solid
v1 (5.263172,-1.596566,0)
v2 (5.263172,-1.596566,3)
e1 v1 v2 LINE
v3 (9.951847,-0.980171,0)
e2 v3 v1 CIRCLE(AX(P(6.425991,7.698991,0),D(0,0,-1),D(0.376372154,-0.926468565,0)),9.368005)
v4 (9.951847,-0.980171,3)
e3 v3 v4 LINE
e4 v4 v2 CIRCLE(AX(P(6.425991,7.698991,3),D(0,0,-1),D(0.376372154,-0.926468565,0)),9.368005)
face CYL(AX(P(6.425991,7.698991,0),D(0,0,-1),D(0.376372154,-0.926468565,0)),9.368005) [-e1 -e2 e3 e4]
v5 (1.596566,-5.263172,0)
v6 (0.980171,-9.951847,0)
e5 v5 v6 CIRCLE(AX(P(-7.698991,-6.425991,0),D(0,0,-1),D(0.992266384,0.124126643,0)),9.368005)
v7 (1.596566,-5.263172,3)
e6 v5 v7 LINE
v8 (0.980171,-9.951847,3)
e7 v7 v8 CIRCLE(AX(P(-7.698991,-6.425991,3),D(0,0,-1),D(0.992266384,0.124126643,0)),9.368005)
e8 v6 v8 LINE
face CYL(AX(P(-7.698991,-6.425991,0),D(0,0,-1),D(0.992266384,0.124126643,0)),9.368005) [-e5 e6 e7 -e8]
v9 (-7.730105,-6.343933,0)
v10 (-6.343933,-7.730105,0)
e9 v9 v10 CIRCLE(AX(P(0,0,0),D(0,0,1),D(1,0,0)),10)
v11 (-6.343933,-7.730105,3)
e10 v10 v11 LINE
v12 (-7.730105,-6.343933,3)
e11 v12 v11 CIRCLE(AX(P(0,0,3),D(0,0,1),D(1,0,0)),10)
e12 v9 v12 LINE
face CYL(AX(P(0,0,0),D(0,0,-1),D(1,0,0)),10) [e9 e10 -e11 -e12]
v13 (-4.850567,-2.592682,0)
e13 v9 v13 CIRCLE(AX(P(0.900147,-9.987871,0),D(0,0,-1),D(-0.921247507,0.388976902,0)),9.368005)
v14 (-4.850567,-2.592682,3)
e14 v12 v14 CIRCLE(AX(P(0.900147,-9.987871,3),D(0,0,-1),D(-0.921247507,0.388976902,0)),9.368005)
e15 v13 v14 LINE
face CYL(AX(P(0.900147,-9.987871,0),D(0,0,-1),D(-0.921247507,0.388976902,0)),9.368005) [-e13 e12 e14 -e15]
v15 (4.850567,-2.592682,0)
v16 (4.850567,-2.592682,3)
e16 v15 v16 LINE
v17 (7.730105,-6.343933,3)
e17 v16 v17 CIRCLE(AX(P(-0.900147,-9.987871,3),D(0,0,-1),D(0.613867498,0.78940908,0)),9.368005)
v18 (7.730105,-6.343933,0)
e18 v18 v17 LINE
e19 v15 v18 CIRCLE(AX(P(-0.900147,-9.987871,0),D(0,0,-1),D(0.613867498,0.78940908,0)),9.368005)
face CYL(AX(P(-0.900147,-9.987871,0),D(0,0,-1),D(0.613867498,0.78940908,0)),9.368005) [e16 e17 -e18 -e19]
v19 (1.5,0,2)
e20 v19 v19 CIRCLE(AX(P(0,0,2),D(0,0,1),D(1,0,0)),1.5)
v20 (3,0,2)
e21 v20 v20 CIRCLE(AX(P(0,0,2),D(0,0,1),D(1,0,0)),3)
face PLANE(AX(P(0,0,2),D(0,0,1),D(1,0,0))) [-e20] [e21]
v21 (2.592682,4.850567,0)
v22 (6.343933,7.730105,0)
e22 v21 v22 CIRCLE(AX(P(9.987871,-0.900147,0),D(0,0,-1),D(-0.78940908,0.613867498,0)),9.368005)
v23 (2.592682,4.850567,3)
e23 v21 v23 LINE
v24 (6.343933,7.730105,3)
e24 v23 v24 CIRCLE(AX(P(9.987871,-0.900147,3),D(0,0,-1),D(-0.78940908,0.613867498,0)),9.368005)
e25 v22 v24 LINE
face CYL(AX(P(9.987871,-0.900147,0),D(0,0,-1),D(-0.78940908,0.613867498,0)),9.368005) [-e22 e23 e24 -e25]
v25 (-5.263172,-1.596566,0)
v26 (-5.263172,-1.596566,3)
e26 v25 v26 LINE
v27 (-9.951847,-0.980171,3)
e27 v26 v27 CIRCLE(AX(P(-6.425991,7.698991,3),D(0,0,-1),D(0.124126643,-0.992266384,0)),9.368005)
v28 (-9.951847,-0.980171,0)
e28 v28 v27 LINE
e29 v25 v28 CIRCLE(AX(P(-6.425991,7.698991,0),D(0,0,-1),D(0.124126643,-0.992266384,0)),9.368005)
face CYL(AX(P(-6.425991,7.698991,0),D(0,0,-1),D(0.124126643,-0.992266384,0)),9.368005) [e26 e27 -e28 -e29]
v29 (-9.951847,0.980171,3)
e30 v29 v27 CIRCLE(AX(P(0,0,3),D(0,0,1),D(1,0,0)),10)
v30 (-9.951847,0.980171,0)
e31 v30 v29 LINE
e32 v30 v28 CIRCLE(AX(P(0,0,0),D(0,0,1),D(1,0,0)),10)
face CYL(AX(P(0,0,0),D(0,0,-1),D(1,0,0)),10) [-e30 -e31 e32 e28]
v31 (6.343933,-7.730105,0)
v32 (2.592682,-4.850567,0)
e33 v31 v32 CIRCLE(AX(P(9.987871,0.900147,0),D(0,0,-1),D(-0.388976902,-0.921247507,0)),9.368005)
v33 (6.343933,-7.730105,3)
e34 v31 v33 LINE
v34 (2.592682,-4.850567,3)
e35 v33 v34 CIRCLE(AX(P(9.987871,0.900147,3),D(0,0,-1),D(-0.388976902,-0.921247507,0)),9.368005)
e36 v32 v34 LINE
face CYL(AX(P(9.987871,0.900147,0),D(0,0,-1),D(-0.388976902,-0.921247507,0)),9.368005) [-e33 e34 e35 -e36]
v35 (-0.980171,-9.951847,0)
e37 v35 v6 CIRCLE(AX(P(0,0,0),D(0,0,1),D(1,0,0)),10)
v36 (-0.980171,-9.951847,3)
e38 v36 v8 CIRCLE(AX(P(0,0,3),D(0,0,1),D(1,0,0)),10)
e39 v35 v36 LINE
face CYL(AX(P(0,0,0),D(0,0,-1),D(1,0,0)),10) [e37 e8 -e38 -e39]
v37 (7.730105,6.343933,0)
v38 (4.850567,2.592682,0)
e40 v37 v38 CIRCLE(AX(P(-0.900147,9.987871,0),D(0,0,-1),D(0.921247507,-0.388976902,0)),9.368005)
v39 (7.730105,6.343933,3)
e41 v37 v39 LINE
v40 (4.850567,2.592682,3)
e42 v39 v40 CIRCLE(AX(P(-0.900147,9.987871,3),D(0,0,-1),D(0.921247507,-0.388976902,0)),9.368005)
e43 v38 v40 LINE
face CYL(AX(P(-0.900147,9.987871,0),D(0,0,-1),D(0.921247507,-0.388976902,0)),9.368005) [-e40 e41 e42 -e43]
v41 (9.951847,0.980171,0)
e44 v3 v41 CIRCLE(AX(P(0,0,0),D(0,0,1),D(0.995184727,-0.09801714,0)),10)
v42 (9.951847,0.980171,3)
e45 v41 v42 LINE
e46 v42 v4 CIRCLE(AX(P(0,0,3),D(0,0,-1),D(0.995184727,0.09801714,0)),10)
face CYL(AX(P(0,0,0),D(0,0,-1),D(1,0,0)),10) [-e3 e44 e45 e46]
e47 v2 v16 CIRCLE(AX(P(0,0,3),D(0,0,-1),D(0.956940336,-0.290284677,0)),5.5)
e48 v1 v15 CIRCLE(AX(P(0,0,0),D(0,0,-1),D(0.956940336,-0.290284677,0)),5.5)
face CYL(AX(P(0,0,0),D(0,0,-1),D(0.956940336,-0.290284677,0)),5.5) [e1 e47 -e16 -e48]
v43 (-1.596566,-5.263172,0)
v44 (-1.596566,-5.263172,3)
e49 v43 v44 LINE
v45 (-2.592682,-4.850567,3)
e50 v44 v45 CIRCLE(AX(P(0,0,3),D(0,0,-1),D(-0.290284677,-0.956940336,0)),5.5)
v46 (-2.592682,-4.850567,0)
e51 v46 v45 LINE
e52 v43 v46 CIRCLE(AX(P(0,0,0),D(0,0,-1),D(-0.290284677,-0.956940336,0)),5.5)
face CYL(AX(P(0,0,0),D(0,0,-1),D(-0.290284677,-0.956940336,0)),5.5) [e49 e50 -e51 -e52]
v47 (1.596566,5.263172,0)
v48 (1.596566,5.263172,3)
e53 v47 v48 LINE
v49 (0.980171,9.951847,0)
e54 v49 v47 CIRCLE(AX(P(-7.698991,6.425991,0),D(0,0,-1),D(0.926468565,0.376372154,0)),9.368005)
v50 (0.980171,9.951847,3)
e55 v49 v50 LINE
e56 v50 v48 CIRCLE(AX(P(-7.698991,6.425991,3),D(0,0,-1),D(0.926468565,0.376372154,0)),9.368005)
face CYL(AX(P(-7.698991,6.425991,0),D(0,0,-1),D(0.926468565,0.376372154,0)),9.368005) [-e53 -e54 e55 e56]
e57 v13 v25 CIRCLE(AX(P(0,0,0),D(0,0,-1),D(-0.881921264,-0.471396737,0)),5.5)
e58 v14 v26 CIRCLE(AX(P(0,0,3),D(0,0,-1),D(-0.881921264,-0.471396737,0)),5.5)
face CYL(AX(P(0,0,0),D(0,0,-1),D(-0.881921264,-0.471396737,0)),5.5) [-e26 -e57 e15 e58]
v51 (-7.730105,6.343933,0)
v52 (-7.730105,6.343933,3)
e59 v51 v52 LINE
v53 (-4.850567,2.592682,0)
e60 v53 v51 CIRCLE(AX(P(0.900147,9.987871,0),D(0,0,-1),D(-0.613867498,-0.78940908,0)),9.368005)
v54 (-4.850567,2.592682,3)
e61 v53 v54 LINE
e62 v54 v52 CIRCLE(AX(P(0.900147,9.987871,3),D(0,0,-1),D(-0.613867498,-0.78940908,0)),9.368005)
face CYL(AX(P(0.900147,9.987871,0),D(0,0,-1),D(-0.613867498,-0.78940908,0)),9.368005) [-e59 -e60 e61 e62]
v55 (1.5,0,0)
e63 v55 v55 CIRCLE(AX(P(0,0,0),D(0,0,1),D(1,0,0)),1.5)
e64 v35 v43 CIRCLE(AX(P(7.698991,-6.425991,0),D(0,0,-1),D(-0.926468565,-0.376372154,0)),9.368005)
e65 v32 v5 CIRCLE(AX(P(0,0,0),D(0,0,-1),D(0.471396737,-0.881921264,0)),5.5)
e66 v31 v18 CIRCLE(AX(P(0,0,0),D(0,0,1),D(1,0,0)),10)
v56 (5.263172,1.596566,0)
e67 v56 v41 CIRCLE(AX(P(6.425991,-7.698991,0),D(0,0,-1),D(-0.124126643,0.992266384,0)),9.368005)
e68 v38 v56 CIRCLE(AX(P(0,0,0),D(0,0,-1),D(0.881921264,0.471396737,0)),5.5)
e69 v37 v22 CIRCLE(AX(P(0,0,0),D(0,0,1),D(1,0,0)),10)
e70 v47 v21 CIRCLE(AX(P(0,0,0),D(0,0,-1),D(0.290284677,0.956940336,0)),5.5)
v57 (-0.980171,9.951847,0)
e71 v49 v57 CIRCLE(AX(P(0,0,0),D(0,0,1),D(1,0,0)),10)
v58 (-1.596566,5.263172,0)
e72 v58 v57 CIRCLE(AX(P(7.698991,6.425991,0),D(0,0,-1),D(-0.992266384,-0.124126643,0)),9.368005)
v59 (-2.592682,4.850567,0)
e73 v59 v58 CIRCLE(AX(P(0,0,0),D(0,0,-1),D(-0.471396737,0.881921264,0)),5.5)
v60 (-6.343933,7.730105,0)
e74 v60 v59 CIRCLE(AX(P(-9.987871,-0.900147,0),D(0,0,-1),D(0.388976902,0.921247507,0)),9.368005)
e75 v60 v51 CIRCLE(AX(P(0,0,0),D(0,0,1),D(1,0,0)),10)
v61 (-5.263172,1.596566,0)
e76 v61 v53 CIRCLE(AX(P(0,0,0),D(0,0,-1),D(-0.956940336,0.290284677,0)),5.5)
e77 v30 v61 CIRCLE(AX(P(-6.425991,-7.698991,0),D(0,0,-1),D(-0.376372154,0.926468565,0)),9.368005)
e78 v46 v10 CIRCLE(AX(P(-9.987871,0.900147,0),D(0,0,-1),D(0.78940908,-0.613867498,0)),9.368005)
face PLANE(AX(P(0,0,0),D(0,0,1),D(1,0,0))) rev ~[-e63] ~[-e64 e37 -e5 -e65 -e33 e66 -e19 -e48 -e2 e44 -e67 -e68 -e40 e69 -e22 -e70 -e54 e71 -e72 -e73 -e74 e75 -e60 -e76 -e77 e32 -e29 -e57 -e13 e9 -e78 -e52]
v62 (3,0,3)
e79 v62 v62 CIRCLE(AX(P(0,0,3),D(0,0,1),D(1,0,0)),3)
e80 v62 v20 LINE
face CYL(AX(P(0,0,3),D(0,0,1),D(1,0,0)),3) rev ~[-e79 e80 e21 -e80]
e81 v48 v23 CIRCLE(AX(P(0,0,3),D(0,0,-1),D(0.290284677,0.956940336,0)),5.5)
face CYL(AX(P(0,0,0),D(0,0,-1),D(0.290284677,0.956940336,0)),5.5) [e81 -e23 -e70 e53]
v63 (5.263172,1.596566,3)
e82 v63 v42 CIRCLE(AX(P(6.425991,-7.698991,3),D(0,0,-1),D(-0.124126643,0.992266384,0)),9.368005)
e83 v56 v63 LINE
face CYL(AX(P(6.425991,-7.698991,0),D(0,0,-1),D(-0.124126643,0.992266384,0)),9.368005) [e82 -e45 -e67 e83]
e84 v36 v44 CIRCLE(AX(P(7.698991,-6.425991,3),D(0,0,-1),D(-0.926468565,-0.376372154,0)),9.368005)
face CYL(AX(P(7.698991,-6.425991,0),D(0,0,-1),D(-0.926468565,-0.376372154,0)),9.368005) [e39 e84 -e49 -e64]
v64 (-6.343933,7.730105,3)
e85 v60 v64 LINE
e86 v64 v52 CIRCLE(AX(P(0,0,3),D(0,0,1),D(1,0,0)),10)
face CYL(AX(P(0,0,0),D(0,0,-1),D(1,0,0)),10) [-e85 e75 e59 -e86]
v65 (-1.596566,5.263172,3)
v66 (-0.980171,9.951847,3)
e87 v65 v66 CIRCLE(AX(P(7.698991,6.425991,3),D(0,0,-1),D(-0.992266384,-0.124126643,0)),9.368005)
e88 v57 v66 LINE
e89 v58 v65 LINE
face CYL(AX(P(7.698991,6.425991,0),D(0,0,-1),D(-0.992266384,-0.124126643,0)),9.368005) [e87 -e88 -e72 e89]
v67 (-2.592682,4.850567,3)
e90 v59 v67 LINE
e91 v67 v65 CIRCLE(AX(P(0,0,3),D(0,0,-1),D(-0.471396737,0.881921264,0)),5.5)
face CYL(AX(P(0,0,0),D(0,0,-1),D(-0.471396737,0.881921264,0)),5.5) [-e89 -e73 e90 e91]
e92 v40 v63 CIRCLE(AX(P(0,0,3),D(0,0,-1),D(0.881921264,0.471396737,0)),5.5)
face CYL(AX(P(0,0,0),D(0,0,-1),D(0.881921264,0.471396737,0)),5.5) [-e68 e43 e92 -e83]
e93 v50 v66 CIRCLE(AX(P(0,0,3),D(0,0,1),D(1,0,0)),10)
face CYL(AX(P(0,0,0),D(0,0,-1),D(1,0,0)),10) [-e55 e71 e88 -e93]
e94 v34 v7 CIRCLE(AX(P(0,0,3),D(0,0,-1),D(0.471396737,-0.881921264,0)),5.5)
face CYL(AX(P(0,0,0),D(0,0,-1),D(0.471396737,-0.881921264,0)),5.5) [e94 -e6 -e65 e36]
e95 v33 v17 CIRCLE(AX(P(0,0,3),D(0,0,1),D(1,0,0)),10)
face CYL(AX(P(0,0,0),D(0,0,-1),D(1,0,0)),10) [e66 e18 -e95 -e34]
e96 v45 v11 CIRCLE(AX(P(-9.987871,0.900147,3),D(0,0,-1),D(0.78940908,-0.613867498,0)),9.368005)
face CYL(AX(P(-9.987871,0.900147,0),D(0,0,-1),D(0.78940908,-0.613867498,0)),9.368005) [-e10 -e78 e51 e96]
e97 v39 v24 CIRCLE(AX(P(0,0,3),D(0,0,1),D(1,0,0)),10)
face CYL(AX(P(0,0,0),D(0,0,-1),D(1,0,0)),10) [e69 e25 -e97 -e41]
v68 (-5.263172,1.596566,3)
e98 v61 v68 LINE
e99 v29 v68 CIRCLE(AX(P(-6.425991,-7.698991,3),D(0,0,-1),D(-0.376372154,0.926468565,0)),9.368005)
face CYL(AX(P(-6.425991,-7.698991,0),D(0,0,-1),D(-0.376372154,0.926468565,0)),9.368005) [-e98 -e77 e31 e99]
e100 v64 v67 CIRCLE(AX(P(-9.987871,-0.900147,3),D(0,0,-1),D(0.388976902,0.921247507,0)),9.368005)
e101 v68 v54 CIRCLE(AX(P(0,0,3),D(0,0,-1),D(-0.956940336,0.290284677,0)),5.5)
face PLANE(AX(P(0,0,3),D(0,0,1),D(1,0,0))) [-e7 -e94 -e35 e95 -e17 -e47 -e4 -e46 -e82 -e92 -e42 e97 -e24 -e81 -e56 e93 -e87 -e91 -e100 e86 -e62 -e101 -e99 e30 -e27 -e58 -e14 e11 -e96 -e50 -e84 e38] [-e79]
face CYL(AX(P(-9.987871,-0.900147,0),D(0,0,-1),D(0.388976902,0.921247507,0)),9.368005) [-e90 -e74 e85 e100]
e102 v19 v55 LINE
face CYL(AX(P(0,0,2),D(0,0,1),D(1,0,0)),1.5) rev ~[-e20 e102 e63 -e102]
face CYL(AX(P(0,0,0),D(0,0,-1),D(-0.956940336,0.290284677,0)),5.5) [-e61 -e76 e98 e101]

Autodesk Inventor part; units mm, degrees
sketch "Sketch1" plane through (0, 0, 0) normal (0, 0, 1) x (1, 0, 0)
  circle A0 centre (0, 0) radius 10
  dimension "d0" = 20
extrude "Extrusion1" add sketch "Sketch1" along normal blind 3
ref_plane "Work Plane2" through (0, 0, 1.5) normal (0, 0, 1) x (1, 0, 0)
sketch "Sketch2" plane through (0, 0, 0) normal (0, 0, -1) x (-1, 0, 0)
  circle A0 centre (0, 0) radius 10 projected
  circle A1 centre (0, 0) radius 8
  dimension "d3" = 16
surface extrude "Pitch Diameter" sketch "Sketch2" against normal through all shown no curves A1
ref_plane "Work Plane8" through (0, 0, 0) normal (0.9238795, 0.3826834, 0) x (0, 0, 1)
ref_plane "Work Plane9" through (0, 0, 0) normal (1, 0, 0) x (0, 1, 0)
spur gear teeth "Spur Gear" teeth 8 pitch diameter 16 tip diameter 20 root diameter 11 face width 3 start plane through (0, 0, 0) normal (0, 0, -1) x (-1, 0, 0)
sketch "Sketch3" plane through (0, 0, 3) normal (0, 0, 1) x (1, 0, 0)
  circle A0 centre (0, 0) radius 3
  dimension "d49" = 6
extrude "Extrusion2" cut sketch "Sketch3" against normal blind 1
sketch "Sketch4" plane through (0, 0, 2) normal (0, 0, 1) x (1, 0, 0)
  circle A0 centre (0, 0) radius 1.5
  dimension "d52" = 3
extrude "Extrusion3" cut sketch "Sketch4" against normal blind 2
equation "\"d0\" = da_da"
equation "\"d1\" = da_b"
equation "\"d3\" = da_d"
equation "\"d16\" = da_aw"
equation "\"d43\" = da_aw"
equation "\"d46\" = da_aw"
equation "\"da_da\" = 20"
equation "\"da_b\" = 3"
equation "\"da_d\" = 16"
equation "\"da_aw\" = 24"
properties part number "engrenagem8_3_furo_3DPrint"
